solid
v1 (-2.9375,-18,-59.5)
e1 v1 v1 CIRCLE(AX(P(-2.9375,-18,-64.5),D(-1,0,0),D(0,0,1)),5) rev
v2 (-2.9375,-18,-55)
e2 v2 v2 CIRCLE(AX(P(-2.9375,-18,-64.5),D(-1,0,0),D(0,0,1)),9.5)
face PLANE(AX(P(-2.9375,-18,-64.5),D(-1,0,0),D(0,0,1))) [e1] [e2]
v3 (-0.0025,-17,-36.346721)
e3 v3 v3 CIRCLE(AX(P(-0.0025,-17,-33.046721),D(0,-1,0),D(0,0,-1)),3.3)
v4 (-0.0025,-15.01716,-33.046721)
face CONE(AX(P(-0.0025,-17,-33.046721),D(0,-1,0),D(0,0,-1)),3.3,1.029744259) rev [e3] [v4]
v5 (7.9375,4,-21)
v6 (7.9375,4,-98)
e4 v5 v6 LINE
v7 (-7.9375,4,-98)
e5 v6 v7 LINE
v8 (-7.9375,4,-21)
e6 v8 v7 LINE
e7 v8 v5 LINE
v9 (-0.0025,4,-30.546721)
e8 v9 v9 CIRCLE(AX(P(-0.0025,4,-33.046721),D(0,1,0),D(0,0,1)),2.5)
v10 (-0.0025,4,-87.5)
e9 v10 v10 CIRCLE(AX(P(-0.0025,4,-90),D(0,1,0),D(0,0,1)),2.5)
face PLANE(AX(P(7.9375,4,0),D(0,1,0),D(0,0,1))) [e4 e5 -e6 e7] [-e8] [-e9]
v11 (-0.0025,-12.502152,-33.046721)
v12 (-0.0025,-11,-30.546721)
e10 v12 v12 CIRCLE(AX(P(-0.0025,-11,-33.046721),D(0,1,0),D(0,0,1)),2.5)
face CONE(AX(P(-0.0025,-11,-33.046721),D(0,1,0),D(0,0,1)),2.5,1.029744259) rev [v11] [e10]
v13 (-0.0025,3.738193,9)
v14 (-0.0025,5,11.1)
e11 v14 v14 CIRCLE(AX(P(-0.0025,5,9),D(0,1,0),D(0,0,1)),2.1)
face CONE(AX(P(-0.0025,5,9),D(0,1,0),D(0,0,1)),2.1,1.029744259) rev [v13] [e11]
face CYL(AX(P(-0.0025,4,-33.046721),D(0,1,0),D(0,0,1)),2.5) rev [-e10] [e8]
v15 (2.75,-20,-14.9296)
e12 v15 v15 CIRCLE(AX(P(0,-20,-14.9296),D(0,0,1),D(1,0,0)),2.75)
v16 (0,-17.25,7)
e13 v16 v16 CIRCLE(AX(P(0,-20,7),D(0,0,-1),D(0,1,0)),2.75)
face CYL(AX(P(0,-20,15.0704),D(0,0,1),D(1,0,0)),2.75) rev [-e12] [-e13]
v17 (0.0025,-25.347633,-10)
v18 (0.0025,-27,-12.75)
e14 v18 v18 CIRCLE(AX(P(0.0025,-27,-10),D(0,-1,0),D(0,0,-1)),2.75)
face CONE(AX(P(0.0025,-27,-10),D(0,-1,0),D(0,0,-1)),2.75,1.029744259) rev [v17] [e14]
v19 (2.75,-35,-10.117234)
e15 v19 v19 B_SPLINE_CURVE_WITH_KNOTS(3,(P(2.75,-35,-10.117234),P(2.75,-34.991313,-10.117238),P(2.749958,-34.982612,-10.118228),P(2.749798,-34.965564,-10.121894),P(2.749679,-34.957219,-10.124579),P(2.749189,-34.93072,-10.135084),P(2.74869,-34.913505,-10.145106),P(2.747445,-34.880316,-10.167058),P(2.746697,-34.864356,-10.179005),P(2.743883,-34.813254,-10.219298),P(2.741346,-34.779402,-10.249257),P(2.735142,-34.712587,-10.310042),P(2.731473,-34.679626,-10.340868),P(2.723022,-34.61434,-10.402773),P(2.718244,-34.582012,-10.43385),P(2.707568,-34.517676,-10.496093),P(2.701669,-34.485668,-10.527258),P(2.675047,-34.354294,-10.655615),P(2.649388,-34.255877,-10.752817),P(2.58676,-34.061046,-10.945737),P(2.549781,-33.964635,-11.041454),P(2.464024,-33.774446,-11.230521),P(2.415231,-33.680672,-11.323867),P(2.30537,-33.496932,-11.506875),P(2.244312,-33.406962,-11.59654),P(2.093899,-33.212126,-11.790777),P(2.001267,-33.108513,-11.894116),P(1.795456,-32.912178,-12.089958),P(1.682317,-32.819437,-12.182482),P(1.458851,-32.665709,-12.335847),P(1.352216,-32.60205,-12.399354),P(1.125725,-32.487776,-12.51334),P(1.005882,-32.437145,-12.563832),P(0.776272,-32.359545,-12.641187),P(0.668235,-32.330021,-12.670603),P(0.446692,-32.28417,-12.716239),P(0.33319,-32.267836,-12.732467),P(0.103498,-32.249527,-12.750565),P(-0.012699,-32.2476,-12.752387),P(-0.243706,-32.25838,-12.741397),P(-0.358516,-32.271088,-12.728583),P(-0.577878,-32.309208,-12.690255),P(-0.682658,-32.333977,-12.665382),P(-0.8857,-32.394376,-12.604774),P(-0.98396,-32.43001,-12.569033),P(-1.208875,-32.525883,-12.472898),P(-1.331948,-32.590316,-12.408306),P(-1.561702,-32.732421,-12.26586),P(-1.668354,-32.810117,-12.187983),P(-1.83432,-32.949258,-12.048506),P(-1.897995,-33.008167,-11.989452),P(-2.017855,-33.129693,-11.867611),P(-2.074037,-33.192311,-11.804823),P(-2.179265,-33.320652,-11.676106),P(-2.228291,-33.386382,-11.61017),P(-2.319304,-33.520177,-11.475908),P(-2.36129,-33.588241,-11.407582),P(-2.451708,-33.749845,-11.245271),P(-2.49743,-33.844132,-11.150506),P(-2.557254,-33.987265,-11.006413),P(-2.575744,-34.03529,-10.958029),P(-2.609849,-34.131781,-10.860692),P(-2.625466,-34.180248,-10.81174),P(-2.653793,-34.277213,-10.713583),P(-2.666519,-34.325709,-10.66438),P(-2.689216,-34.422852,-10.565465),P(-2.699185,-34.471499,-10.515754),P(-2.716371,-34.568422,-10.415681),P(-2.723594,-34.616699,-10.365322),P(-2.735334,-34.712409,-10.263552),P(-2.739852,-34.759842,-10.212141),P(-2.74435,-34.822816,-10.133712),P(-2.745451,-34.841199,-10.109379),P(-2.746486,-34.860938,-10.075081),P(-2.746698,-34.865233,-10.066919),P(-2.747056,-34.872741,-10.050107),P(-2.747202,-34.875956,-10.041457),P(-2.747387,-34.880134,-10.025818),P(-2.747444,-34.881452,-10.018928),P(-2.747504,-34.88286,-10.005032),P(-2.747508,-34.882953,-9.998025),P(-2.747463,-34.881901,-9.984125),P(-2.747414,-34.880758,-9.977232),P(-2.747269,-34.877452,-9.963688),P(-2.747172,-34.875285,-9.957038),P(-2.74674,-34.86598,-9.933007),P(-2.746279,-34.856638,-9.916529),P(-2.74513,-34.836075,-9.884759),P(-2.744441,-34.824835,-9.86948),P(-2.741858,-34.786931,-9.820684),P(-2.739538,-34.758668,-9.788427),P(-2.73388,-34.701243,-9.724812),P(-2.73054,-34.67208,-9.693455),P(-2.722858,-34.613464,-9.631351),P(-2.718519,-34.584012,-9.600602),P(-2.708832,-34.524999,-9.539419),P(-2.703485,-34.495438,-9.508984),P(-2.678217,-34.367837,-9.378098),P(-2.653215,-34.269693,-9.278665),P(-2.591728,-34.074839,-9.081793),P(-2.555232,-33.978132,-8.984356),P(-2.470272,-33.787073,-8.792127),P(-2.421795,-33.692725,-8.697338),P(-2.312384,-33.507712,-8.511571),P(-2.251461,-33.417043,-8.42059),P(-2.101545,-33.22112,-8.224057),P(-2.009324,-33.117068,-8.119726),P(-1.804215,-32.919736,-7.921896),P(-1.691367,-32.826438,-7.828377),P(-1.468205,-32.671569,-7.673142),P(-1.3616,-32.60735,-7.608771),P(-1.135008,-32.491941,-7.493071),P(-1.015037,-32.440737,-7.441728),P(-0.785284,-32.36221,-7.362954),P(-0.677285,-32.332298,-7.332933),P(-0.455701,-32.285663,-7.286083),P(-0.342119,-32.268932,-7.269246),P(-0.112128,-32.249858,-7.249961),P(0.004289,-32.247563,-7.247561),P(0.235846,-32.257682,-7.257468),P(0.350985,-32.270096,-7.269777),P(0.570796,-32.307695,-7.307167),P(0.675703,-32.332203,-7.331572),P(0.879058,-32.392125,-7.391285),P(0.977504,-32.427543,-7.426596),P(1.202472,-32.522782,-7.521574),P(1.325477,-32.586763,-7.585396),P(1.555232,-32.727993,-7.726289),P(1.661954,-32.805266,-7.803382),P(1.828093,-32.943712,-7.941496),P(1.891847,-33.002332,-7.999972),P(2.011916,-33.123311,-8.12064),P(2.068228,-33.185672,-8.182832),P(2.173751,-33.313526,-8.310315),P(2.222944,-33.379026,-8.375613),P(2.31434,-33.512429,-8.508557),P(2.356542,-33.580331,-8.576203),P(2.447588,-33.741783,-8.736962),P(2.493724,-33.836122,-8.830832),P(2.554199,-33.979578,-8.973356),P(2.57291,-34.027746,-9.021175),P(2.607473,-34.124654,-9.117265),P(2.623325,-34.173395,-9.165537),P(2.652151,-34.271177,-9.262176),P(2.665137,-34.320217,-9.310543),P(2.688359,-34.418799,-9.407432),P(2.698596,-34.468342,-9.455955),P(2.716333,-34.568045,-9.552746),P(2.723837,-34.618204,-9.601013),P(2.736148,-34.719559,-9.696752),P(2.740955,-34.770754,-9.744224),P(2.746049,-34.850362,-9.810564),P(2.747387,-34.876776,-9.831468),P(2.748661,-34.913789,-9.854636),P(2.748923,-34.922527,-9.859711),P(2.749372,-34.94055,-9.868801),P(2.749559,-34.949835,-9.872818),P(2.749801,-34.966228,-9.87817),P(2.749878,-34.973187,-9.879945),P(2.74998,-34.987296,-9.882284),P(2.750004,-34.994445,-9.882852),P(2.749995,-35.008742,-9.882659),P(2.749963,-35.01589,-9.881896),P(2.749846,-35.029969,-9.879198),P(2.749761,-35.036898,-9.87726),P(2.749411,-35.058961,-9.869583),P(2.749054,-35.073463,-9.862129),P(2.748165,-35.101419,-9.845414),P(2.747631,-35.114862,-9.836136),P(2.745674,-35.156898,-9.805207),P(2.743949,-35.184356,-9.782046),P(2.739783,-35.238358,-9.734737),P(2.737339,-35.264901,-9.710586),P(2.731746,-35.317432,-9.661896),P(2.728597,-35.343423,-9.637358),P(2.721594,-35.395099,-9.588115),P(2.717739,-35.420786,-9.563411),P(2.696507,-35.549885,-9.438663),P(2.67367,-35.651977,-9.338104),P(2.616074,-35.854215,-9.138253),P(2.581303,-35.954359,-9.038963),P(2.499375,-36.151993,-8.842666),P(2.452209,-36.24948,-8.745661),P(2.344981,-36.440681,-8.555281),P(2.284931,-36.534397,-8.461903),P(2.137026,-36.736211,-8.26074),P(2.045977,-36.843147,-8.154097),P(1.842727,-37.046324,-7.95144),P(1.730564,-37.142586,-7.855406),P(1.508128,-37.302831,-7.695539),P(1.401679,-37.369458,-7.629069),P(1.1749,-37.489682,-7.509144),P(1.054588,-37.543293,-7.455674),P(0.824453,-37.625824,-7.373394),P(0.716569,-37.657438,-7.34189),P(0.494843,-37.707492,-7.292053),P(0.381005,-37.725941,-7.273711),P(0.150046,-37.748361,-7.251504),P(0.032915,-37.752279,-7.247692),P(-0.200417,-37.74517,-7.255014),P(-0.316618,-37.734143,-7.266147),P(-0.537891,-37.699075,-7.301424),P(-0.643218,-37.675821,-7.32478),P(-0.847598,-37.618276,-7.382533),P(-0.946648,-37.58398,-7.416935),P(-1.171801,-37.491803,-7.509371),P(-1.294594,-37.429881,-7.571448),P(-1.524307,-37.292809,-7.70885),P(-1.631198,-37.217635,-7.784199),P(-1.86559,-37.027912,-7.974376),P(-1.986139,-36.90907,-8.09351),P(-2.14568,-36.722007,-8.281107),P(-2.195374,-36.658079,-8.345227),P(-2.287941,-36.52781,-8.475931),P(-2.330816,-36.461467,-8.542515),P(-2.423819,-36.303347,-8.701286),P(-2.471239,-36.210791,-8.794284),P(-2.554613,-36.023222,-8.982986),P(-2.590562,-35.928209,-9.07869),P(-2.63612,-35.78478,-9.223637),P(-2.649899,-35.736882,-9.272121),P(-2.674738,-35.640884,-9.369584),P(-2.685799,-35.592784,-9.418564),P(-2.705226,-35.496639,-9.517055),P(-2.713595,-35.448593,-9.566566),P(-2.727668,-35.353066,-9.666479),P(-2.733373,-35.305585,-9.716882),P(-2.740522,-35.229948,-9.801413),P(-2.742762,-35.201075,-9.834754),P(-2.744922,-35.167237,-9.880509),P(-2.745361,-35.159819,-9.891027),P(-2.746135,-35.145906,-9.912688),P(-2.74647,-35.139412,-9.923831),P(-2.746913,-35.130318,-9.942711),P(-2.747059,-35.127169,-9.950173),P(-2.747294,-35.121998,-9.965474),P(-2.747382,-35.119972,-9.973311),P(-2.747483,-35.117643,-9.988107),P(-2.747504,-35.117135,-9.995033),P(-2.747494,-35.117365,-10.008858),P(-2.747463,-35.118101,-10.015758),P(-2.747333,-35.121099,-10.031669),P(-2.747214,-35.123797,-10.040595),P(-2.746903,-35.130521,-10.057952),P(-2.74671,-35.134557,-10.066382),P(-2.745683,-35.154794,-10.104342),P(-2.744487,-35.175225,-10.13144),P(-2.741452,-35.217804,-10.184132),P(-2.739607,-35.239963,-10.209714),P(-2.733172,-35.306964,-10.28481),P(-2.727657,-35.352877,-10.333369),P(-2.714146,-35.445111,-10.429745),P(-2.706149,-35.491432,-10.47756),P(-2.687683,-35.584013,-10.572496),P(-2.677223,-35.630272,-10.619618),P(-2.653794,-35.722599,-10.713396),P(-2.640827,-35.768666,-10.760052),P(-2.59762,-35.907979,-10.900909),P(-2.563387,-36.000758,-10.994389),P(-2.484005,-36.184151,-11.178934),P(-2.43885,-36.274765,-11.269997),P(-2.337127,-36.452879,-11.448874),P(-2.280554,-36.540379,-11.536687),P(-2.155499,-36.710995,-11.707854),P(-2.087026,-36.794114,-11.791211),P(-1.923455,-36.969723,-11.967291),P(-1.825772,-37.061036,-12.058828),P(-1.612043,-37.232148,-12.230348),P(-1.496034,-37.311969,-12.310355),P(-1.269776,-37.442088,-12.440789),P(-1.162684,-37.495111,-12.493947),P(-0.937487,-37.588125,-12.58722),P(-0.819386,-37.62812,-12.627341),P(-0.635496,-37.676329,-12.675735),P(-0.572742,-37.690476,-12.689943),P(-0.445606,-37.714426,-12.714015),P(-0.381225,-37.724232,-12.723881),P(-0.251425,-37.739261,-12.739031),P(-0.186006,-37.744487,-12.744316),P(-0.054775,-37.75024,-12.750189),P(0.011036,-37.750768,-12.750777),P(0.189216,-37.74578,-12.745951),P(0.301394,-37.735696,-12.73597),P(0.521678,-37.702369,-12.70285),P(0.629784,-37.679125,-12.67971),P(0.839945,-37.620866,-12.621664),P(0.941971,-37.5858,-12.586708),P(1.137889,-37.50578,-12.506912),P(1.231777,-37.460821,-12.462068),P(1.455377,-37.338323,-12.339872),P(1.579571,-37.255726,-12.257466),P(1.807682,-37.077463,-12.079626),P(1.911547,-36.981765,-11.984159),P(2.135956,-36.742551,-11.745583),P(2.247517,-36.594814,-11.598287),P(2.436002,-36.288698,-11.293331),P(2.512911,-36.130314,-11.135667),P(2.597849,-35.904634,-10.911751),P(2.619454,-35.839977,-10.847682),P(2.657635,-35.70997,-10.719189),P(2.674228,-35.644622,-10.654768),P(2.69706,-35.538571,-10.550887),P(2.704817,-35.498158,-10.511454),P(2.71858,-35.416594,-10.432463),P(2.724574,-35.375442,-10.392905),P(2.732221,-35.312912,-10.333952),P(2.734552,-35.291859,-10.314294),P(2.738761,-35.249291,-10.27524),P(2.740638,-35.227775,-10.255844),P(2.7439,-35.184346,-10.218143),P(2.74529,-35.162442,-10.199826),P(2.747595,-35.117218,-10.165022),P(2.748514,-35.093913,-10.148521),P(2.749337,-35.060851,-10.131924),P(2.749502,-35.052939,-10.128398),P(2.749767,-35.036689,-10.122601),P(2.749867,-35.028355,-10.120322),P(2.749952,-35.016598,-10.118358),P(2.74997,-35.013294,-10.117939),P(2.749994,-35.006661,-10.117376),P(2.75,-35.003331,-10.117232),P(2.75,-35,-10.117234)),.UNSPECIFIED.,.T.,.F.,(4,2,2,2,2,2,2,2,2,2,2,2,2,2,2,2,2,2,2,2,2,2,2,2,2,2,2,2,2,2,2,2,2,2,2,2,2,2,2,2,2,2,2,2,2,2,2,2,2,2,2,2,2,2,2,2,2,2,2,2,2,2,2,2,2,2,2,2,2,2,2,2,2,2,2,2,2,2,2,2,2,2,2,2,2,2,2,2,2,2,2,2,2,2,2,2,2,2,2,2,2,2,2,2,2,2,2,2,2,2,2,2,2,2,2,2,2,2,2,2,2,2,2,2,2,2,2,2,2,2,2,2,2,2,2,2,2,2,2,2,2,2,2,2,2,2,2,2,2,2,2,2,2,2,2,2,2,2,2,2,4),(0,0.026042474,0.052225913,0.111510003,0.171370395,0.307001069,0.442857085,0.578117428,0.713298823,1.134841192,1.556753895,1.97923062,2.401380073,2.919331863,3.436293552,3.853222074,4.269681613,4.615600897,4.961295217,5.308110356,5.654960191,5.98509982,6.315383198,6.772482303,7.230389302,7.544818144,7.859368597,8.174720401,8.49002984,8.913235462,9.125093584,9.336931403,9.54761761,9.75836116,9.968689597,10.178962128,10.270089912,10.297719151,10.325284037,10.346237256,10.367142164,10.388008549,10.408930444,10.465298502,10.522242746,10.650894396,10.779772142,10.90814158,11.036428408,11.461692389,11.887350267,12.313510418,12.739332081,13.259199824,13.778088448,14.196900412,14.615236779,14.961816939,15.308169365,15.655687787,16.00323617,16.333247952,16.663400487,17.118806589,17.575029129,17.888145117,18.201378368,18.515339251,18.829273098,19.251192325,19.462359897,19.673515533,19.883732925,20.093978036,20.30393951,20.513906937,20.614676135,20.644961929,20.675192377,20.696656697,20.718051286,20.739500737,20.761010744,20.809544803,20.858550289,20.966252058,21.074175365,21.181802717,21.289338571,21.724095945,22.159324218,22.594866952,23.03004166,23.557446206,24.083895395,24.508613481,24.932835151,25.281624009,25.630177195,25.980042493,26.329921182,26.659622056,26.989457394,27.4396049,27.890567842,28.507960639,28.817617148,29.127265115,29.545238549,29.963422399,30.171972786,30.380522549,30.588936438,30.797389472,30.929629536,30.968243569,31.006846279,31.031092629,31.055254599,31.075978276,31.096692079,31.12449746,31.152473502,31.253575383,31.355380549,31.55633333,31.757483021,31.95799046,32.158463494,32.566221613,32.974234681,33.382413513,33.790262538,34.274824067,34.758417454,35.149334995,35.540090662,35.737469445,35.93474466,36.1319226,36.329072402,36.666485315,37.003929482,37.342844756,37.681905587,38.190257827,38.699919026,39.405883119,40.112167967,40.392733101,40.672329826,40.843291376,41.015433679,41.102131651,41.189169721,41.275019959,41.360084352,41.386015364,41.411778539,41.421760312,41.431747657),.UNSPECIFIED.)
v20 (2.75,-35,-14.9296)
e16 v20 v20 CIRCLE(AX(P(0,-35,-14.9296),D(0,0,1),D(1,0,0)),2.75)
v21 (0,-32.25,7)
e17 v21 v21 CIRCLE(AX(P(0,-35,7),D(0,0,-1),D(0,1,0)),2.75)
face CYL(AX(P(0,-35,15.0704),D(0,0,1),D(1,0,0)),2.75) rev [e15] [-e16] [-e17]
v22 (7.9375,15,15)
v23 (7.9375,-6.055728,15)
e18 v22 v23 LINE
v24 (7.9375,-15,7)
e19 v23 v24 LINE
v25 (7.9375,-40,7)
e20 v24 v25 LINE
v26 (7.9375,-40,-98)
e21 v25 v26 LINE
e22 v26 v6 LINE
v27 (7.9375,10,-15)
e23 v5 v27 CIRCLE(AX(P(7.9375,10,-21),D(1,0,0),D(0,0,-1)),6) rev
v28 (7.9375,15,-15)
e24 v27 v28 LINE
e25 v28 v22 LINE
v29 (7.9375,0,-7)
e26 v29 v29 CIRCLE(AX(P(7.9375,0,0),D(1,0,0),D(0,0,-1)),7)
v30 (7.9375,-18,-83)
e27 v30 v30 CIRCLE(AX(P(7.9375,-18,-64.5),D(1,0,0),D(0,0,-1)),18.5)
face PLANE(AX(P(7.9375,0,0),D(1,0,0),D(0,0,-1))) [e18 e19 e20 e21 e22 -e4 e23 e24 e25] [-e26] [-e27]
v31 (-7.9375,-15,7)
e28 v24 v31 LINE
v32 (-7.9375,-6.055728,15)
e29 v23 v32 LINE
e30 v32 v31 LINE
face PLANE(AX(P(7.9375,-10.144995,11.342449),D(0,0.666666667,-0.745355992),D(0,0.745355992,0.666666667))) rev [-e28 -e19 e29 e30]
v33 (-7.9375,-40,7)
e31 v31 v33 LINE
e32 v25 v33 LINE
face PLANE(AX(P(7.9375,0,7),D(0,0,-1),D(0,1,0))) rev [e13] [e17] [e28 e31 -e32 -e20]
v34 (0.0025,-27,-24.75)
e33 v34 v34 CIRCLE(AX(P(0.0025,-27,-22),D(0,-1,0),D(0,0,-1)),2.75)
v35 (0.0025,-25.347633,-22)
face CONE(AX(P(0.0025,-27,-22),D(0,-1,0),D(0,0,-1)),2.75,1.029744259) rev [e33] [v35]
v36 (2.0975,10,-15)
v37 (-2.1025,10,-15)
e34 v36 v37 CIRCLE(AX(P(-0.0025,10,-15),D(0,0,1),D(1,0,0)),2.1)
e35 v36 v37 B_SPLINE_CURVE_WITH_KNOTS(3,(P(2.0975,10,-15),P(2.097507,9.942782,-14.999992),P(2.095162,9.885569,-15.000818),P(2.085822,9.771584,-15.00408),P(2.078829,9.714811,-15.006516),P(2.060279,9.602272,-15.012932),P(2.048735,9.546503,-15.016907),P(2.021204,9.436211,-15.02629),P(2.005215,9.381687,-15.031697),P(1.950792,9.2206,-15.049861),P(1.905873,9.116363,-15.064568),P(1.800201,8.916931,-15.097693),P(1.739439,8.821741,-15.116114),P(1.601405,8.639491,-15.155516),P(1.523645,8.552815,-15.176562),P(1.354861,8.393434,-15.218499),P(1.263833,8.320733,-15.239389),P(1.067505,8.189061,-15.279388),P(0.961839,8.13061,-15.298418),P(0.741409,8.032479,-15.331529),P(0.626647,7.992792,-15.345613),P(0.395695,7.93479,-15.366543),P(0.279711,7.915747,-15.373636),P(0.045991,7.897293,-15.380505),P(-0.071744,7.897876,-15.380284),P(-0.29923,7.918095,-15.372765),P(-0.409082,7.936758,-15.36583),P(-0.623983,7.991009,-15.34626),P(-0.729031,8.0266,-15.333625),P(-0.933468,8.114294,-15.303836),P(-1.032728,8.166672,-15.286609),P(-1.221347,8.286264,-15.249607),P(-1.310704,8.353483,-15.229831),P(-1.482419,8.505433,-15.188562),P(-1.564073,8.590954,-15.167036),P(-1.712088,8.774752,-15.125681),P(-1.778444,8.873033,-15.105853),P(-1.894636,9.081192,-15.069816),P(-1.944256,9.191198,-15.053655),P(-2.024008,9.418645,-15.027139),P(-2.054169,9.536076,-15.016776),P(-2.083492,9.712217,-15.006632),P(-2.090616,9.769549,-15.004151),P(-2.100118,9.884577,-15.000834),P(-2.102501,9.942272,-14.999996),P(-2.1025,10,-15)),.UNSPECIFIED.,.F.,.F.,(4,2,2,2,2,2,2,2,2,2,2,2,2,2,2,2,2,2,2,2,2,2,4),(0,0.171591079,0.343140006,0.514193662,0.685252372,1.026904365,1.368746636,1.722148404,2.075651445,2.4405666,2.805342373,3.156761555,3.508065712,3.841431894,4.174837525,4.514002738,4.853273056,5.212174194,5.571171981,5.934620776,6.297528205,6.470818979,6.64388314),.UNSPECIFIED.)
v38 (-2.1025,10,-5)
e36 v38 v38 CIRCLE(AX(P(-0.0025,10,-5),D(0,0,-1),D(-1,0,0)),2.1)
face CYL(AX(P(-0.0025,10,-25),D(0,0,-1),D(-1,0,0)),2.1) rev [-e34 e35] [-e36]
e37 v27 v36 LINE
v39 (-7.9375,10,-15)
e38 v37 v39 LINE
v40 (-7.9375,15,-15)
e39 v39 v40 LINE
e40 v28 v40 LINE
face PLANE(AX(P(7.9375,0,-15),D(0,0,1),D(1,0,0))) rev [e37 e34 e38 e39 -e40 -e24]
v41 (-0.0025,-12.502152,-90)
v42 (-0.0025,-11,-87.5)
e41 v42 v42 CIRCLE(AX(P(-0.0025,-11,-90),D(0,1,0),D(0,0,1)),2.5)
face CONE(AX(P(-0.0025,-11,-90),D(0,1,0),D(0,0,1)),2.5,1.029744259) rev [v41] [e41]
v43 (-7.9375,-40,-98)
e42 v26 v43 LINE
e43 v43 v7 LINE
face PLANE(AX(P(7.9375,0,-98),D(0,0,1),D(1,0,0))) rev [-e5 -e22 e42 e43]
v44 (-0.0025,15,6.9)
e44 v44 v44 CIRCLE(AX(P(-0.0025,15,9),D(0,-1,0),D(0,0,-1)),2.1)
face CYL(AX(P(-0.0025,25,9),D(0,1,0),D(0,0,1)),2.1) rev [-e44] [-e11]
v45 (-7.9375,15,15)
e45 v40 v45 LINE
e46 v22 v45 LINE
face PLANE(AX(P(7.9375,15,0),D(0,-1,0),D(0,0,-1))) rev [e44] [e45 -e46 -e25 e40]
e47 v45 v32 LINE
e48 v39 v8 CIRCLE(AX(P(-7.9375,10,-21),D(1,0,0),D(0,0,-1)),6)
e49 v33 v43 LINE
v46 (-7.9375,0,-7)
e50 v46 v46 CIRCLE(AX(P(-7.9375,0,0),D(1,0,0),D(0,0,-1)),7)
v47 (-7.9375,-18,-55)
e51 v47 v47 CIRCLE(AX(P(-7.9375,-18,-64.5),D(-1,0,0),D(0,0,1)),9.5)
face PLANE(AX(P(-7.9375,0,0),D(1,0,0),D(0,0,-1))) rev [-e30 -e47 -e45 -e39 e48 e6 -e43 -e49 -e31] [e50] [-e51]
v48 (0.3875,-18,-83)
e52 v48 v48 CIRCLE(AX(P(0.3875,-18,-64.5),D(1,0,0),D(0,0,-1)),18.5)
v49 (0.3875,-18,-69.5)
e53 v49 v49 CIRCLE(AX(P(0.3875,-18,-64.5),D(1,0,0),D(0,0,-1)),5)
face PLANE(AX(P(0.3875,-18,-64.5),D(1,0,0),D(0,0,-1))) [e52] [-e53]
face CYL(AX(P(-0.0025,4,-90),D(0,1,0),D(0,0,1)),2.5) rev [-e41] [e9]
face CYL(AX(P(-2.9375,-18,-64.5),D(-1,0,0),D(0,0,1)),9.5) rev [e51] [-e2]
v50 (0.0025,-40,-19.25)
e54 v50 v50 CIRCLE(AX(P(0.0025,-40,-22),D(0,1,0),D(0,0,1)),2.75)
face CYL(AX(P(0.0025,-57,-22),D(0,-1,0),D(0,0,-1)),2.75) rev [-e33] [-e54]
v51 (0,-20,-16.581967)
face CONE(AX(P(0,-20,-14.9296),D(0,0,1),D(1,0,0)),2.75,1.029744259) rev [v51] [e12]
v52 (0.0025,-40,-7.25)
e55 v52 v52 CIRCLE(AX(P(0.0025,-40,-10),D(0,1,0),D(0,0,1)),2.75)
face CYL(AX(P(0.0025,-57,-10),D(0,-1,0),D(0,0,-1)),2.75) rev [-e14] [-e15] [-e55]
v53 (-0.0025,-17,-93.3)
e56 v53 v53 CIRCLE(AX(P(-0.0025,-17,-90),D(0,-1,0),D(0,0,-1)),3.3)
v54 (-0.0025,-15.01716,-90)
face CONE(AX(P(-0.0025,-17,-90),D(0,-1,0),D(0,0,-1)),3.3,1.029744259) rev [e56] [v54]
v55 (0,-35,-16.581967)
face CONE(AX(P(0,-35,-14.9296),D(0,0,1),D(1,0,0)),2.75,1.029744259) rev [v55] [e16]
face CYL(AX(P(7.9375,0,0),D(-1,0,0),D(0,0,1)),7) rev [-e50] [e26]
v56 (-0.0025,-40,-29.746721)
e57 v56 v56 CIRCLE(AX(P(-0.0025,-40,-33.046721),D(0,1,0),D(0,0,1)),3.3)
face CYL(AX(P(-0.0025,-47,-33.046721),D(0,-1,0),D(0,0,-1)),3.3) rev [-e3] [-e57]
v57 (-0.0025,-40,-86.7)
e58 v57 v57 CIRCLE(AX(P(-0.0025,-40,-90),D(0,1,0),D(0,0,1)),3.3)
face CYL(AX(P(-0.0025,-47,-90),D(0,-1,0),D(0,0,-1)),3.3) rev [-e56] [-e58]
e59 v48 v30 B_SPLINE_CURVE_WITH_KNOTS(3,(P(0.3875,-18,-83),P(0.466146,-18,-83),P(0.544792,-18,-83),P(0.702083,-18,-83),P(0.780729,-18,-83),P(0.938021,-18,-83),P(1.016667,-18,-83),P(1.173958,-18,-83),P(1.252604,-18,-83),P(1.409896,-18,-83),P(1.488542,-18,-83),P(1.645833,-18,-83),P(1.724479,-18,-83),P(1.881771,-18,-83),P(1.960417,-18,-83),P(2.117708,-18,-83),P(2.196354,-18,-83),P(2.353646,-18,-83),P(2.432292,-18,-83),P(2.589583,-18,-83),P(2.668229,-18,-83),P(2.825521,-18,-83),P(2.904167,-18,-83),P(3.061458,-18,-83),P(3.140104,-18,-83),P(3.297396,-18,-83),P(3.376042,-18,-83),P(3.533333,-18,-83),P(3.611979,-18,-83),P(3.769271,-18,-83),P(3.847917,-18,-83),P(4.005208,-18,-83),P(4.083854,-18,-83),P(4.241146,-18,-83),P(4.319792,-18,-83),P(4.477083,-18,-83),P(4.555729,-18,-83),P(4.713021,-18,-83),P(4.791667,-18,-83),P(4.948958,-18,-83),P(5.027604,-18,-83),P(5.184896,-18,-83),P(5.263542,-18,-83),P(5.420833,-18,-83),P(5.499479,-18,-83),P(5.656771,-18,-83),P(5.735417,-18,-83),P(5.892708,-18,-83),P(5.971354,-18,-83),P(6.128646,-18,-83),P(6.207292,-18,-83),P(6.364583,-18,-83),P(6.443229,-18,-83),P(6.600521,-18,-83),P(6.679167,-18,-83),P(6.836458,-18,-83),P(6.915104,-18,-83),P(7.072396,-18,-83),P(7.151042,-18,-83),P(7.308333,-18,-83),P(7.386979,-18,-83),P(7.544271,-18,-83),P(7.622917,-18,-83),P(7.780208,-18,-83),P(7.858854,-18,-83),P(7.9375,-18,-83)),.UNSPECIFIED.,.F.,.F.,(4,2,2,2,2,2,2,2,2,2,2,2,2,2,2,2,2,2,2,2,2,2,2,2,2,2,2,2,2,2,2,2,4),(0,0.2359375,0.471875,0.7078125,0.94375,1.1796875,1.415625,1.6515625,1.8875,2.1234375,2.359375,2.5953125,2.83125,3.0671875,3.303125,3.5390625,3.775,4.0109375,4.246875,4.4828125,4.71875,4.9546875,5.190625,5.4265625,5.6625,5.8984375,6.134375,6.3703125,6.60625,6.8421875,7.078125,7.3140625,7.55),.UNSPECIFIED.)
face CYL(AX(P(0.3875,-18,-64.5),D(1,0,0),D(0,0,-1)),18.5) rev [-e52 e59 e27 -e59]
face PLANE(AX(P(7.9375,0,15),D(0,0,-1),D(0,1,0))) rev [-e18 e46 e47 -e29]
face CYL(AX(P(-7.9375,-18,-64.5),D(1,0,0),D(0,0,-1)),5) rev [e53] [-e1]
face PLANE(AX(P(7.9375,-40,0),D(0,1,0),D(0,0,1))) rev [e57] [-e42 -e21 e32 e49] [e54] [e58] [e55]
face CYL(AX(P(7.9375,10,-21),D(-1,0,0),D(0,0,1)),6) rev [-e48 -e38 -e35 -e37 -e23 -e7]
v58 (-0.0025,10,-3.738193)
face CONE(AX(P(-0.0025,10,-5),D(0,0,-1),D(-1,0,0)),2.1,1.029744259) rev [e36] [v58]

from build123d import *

# Parameters (mm, degrees)
ESBO_O1_R                                            = 7
RESSALTO_EXTRUS_O1_DEPTH                             = 7.9375
ESCAREADO_PARA_PARAFUSO_DE_M_QUINA_COM_C_D           = 5.5
ESCAREADO_PARA_PARAFUSO_DE_M_QUINA_COM_C_DEPTH       = 30
ESCAREADO_PARA_PARAFUSO_DE_M_QUINA_COM_C_CSINK_D     = 10.4
ESCAREADO_PARA_PARAFUSO_DE_M_QUINA_COM_C_CSINK_ANGLE = 90
ESCAREADO_PARA_PARAFUSO_DE_M_QUINA_COM_C_TIP         = 1.652366702
ESCAREADO_PARA_PARAFUSO_DE_M_QUINA_C_2_D             = 6.6
ESCAREADO_PARA_PARAFUSO_DE_M_QUINA_C_2_DEPTH         = 30
ESCAREADO_PARA_PARAFUSO_DE_M_QUINA_C_2_CSINK_D       = 12.6
ESCAREADO_PARA_PARAFUSO_DE_M_QUINA_C_2_CSINK_ANGLE   = 90
ESCAREADO_PARA_PARAFUSO_DE_M_QUINA_C_2_TIP           = 1.982840043
BROCA_DE_ROSQUEAR_PARA_TARRAXA_DE_M5X0_8_D           = 4.2
BROCA_DE_ROSQUEAR_PARA_TARRAXA_DE_M5X0_8_DEPTH       = 20
BROCA_DE_ROSQUEAR_PARA_TARRAXA_DE_M5X0_8_TIP         = 1.2618073
BROCA_DE_ROSQUEAR_PARA_TARRAXA_DE_M5_2_D             = 4.2
BROCA_DE_ROSQUEAR_PARA_TARRAXA_DE_M5_2_DEPTH         = 20
BROCA_DE_ROSQUEAR_PARA_TARRAXA_DE_M5_2_TIP           = 1.2618073
BROCA_DE_ROSQUEAR_PARA_TARRAXA_DE_M6X1_0_D           = 5
BROCA_DE_ROSQUEAR_PARA_TARRAXA_DE_M6X1_0_DEPTH       = 15
BROCA_DE_ROSQUEAR_PARA_TARRAXA_DE_M6X1_0_TIP         = 1.502151548
ESCAREADO_PARA_SFHCS_M51_AT_2_COUNT                  = 2
ESCAREADO_PARA_SFHCS_M51_AT_2_PITCH                  = 12
ESCAREADO_PARA_SFHCS_M51_AT_3_COUNT                  = 2
ESCAREADO_PARA_SFHCS_M51_AT_3_PITCH                  = 67.209946437
ESCAREADO_PARA_SFHCS_M51_AT_4_COUNT                  = 2
ESCAREADO_PARA_SFHCS_M51_AT_4_PITCH                  = 66.13
SKETCH1_R                                            = 18.5
CUT_EXTRUDE1_DEPTH                                   = 7.55
SKETCH2_R                                            = 5
CUT_EXTRUDE2_DEPTH                                   = 107.175824146
SKETCH3_R                                            = 9.5
CUT_EXTRUDE3_DEPTH                                   = 5
FILLET1_R                                            = 6


with BuildPart() as part:
    # Esboço1 → Ressalto-extrusão1 (new, symmetric)
    with BuildSketch(Plane(origin=(0, 0, 0), x_dir=(0, 0, -1), z_dir=(1, 0, 0))):
        Polygon((15, 15), (-15, 15), (-15, -6.05572809), (-7, -15), (-7, -40), (98, -40), (98, 4), (15, 4), align=None)
        Circle(ESBO_O1_R, mode=Mode.SUBTRACT)
    extrude(amount=RESSALTO_EXTRUS_O1_DEPTH, both=True)

    # Escareado para parafuso de m_quina com c
    with Locations(Plane(origin=(-33.0625, -33.751665499, 15.070399895), x_dir=(1, 0, 0), z_dir=(0, 0, 1))):
        with Locations((-33.0625, 13.751665499), (-33.0625, -1.248334501), (33.0625, -1.248334501), (33.0625, 13.751665499)):
            CounterSinkHole(ESCAREADO_PARA_PARAFUSO_DE_M_QUINA_COM_C_D / 2, ESCAREADO_PARA_PARAFUSO_DE_M_QUINA_COM_C_CSINK_D / 2, depth=ESCAREADO_PARA_PARAFUSO_DE_M_QUINA_COM_C_DEPTH, counter_sink_angle=ESCAREADO_PARA_PARAFUSO_DE_M_QUINA_COM_C_CSINK_ANGLE)
            with Locations((0, 0, -(ESCAREADO_PARA_PARAFUSO_DE_M_QUINA_COM_C_DEPTH + ESCAREADO_PARA_PARAFUSO_DE_M_QUINA_COM_C_TIP / 2))):  # 118° drill point
                Cone(0, ESCAREADO_PARA_PARAFUSO_DE_M_QUINA_COM_C_D / 2, ESCAREADO_PARA_PARAFUSO_DE_M_QUINA_COM_C_TIP, mode=Mode.SUBTRACT)

    # Escareado para parafuso de m_quina c 2
    with Locations(Plane(origin=(-33.0625, -47, -36.460196829), x_dir=(-1, 0, 0), z_dir=(0, -1, 0))):
        with Locations((33.06, 49.586524306), (33.06, -3.413475694), (-33.06, -3.413475694), (-33.06, 53.539803171)):
            CounterSinkHole(ESCAREADO_PARA_PARAFUSO_DE_M_QUINA_C_2_D / 2, ESCAREADO_PARA_PARAFUSO_DE_M_QUINA_C_2_CSINK_D / 2, depth=ESCAREADO_PARA_PARAFUSO_DE_M_QUINA_C_2_DEPTH, counter_sink_angle=ESCAREADO_PARA_PARAFUSO_DE_M_QUINA_C_2_CSINK_ANGLE)
            with Locations((0, 0, -(ESCAREADO_PARA_PARAFUSO_DE_M_QUINA_C_2_DEPTH + ESCAREADO_PARA_PARAFUSO_DE_M_QUINA_C_2_TIP / 2))):  # 118° drill point
                Cone(0, ESCAREADO_PARA_PARAFUSO_DE_M_QUINA_C_2_D / 2, ESCAREADO_PARA_PARAFUSO_DE_M_QUINA_C_2_TIP, mode=Mode.SUBTRACT)

    # Broca de rosquear para tarraxa de M5x0.8
    with Locations(Plane(origin=(-33.0625, 25, -36.460196829), x_dir=(1, 0, 0), z_dir=(0, 1, 0))):
        with Locations((33.06, -45.460196829), (-33.065, -45.460196829)):
            Hole(BROCA_DE_ROSQUEAR_PARA_TARRAXA_DE_M5X0_8_D / 2, depth=BROCA_DE_ROSQUEAR_PARA_TARRAXA_DE_M5X0_8_DEPTH)
            with Locations((0, 0, -(BROCA_DE_ROSQUEAR_PARA_TARRAXA_DE_M5X0_8_DEPTH + BROCA_DE_ROSQUEAR_PARA_TARRAXA_DE_M5X0_8_TIP / 2))):  # 118° drill point
                Cone(0, BROCA_DE_ROSQUEAR_PARA_TARRAXA_DE_M5X0_8_D / 2, BROCA_DE_ROSQUEAR_PARA_TARRAXA_DE_M5X0_8_TIP, mode=Mode.SUBTRACT)

    # Broca de rosquear para tarraxa de M5 2
    with Locations(Plane(origin=(-33.0625, -33.751665499, -25), x_dir=(-1, 0, 0), z_dir=(0, 0, -1))):
        with Locations((-33.06, 43.751665499), (33.065, 43.751665499)):
            Hole(BROCA_DE_ROSQUEAR_PARA_TARRAXA_DE_M5_2_D / 2, depth=BROCA_DE_ROSQUEAR_PARA_TARRAXA_DE_M5_2_DEPTH)
            with Locations((0, 0, -(BROCA_DE_ROSQUEAR_PARA_TARRAXA_DE_M5_2_DEPTH + BROCA_DE_ROSQUEAR_PARA_TARRAXA_DE_M5_2_TIP / 2))):  # 118° drill point
                Cone(0, BROCA_DE_ROSQUEAR_PARA_TARRAXA_DE_M5_2_D / 2, BROCA_DE_ROSQUEAR_PARA_TARRAXA_DE_M5_2_TIP, mode=Mode.SUBTRACT)

    # Broca de rosquear para tarraxa de M6x1.01
    with Locations(Plane(origin=(-33.0625, 4, -36.460196829), x_dir=(1, 0, 0), z_dir=(0, 1, 0))):
        with Locations((33.06, 53.539803171), (-33.06, 49.539803171), (-33.06, -3.413475694), (33.06, -3.413475694)):
            Hole(BROCA_DE_ROSQUEAR_PARA_TARRAXA_DE_M6X1_0_D / 2, depth=BROCA_DE_ROSQUEAR_PARA_TARRAXA_DE_M6X1_0_DEPTH)
            with Locations((0, 0, -(BROCA_DE_ROSQUEAR_PARA_TARRAXA_DE_M6X1_0_DEPTH + BROCA_DE_ROSQUEAR_PARA_TARRAXA_DE_M6X1_0_TIP / 2))):  # 118° drill point
                Cone(0, BROCA_DE_ROSQUEAR_PARA_TARRAXA_DE_M6X1_0_D / 2, BROCA_DE_ROSQUEAR_PARA_TARRAXA_DE_M6X1_0_TIP, mode=Mode.SUBTRACT)

    # Esboço23 → Escareado para SFHCS M51 (revolve, cut)
    with BuildSketch(Plane(origin=(0.0025, -57, -22), x_dir=(0, 0, -1), z_dir=(1, 0, 0))):
        Polygon((0, 0), (0, 31.652366702), (2.75, 30), (2.75, 3.35), (5.6, 0.5), (5.6, 0), align=None)
    escareado_para_sfhcs_m51 = revolve(axis=Axis((0.0025, -63.35, -22), (0, 1, 0)), mode=Mode.SUBTRACT)

    # Escareado para SFHCS M51 at 2: Escareado para SFHCS M51 ×2
    with Locations(*[(0, 0, i * ESCAREADO_PARA_SFHCS_M51_AT_2_PITCH) for i in range(1, ESCAREADO_PARA_SFHCS_M51_AT_2_COUNT)]):
        add(escareado_para_sfhcs_m51, mode=Mode.SUBTRACT)

    # Escareado para SFHCS M51 at 3: Escareado para SFHCS M51 ×2
    with Locations(*[Vector(-0.9839317468056482, 0, 0.17854500168861012) * (i * ESCAREADO_PARA_SFHCS_M51_AT_3_PITCH) for i in range(1, ESCAREADO_PARA_SFHCS_M51_AT_3_COUNT)]):
        add(escareado_para_sfhcs_m51, mode=Mode.SUBTRACT)

    # Escareado para SFHCS M51 at 4: Escareado para SFHCS M51 ×2
    with Locations(*[(-i * ESCAREADO_PARA_SFHCS_M51_AT_4_PITCH, 0, 0) for i in range(1, ESCAREADO_PARA_SFHCS_M51_AT_4_COUNT)]):
        add(escareado_para_sfhcs_m51, mode=Mode.SUBTRACT)

    # Sketch1 → Cut-Extrude1 (cut)
    with BuildSketch(Plane(origin=(7.9375, 0, 0), x_dir=(0, 0, -1), z_dir=(1, 0, 0))):
        with Locations((64.5, -18)):
            Circle(SKETCH1_R)
    extrude(amount=-CUT_EXTRUDE1_DEPTH, mode=Mode.SUBTRACT)

    # Sketch2 → Cut-Extrude2 (cut, through all)
    with BuildSketch(Plane(origin=(0.3875, 0, 0), x_dir=(0, 0, -1), z_dir=(1, 0, 0))):
        with Locations((64.5, -18)):
            Circle(SKETCH2_R)
    extrude(amount=-CUT_EXTRUDE2_DEPTH, mode=Mode.SUBTRACT)

    # Sketch3 → Cut-Extrude3 (cut)
    with BuildSketch(Plane.ZY.offset(7.9375)):
        with Locations((-64.5, -18)):
            Circle(SKETCH3_R)
    extrude(amount=-CUT_EXTRUDE3_DEPTH, mode=Mode.SUBTRACT)

    # Fillet1
    # the kernel refuses this fillet: 6 mm, written as the material it adds along each edge
    with BuildSketch(Plane(origin=(7.9375, 4, -15), x_dir=(0, 1, 0), z_dir=(-1, 0, 0))) as fillet1_piece_1_section:
        with BuildLine():
            CenterArc((FILLET1_R, FILLET1_R), FILLET1_R, 180, 90)
            Line((0, FILLET1_R), (0, 0))
            Line((0, 0), (FILLET1_R, 0))
        make_face()
    fillet1_piece_1 = extrude(amount=15.875, mode=Mode.PRIVATE)
    fillet1_piece_1 = fillet1_piece_1 - Plane(origin=(-0.0025, 10, -16.372210647), x_dir=(1, 0, 0), z_dir=(0, 0, 1)) * Cylinder(2.1, 56, mode=Mode.PRIVATE)
    add(fillet1_piece_1)


solid = part.part
